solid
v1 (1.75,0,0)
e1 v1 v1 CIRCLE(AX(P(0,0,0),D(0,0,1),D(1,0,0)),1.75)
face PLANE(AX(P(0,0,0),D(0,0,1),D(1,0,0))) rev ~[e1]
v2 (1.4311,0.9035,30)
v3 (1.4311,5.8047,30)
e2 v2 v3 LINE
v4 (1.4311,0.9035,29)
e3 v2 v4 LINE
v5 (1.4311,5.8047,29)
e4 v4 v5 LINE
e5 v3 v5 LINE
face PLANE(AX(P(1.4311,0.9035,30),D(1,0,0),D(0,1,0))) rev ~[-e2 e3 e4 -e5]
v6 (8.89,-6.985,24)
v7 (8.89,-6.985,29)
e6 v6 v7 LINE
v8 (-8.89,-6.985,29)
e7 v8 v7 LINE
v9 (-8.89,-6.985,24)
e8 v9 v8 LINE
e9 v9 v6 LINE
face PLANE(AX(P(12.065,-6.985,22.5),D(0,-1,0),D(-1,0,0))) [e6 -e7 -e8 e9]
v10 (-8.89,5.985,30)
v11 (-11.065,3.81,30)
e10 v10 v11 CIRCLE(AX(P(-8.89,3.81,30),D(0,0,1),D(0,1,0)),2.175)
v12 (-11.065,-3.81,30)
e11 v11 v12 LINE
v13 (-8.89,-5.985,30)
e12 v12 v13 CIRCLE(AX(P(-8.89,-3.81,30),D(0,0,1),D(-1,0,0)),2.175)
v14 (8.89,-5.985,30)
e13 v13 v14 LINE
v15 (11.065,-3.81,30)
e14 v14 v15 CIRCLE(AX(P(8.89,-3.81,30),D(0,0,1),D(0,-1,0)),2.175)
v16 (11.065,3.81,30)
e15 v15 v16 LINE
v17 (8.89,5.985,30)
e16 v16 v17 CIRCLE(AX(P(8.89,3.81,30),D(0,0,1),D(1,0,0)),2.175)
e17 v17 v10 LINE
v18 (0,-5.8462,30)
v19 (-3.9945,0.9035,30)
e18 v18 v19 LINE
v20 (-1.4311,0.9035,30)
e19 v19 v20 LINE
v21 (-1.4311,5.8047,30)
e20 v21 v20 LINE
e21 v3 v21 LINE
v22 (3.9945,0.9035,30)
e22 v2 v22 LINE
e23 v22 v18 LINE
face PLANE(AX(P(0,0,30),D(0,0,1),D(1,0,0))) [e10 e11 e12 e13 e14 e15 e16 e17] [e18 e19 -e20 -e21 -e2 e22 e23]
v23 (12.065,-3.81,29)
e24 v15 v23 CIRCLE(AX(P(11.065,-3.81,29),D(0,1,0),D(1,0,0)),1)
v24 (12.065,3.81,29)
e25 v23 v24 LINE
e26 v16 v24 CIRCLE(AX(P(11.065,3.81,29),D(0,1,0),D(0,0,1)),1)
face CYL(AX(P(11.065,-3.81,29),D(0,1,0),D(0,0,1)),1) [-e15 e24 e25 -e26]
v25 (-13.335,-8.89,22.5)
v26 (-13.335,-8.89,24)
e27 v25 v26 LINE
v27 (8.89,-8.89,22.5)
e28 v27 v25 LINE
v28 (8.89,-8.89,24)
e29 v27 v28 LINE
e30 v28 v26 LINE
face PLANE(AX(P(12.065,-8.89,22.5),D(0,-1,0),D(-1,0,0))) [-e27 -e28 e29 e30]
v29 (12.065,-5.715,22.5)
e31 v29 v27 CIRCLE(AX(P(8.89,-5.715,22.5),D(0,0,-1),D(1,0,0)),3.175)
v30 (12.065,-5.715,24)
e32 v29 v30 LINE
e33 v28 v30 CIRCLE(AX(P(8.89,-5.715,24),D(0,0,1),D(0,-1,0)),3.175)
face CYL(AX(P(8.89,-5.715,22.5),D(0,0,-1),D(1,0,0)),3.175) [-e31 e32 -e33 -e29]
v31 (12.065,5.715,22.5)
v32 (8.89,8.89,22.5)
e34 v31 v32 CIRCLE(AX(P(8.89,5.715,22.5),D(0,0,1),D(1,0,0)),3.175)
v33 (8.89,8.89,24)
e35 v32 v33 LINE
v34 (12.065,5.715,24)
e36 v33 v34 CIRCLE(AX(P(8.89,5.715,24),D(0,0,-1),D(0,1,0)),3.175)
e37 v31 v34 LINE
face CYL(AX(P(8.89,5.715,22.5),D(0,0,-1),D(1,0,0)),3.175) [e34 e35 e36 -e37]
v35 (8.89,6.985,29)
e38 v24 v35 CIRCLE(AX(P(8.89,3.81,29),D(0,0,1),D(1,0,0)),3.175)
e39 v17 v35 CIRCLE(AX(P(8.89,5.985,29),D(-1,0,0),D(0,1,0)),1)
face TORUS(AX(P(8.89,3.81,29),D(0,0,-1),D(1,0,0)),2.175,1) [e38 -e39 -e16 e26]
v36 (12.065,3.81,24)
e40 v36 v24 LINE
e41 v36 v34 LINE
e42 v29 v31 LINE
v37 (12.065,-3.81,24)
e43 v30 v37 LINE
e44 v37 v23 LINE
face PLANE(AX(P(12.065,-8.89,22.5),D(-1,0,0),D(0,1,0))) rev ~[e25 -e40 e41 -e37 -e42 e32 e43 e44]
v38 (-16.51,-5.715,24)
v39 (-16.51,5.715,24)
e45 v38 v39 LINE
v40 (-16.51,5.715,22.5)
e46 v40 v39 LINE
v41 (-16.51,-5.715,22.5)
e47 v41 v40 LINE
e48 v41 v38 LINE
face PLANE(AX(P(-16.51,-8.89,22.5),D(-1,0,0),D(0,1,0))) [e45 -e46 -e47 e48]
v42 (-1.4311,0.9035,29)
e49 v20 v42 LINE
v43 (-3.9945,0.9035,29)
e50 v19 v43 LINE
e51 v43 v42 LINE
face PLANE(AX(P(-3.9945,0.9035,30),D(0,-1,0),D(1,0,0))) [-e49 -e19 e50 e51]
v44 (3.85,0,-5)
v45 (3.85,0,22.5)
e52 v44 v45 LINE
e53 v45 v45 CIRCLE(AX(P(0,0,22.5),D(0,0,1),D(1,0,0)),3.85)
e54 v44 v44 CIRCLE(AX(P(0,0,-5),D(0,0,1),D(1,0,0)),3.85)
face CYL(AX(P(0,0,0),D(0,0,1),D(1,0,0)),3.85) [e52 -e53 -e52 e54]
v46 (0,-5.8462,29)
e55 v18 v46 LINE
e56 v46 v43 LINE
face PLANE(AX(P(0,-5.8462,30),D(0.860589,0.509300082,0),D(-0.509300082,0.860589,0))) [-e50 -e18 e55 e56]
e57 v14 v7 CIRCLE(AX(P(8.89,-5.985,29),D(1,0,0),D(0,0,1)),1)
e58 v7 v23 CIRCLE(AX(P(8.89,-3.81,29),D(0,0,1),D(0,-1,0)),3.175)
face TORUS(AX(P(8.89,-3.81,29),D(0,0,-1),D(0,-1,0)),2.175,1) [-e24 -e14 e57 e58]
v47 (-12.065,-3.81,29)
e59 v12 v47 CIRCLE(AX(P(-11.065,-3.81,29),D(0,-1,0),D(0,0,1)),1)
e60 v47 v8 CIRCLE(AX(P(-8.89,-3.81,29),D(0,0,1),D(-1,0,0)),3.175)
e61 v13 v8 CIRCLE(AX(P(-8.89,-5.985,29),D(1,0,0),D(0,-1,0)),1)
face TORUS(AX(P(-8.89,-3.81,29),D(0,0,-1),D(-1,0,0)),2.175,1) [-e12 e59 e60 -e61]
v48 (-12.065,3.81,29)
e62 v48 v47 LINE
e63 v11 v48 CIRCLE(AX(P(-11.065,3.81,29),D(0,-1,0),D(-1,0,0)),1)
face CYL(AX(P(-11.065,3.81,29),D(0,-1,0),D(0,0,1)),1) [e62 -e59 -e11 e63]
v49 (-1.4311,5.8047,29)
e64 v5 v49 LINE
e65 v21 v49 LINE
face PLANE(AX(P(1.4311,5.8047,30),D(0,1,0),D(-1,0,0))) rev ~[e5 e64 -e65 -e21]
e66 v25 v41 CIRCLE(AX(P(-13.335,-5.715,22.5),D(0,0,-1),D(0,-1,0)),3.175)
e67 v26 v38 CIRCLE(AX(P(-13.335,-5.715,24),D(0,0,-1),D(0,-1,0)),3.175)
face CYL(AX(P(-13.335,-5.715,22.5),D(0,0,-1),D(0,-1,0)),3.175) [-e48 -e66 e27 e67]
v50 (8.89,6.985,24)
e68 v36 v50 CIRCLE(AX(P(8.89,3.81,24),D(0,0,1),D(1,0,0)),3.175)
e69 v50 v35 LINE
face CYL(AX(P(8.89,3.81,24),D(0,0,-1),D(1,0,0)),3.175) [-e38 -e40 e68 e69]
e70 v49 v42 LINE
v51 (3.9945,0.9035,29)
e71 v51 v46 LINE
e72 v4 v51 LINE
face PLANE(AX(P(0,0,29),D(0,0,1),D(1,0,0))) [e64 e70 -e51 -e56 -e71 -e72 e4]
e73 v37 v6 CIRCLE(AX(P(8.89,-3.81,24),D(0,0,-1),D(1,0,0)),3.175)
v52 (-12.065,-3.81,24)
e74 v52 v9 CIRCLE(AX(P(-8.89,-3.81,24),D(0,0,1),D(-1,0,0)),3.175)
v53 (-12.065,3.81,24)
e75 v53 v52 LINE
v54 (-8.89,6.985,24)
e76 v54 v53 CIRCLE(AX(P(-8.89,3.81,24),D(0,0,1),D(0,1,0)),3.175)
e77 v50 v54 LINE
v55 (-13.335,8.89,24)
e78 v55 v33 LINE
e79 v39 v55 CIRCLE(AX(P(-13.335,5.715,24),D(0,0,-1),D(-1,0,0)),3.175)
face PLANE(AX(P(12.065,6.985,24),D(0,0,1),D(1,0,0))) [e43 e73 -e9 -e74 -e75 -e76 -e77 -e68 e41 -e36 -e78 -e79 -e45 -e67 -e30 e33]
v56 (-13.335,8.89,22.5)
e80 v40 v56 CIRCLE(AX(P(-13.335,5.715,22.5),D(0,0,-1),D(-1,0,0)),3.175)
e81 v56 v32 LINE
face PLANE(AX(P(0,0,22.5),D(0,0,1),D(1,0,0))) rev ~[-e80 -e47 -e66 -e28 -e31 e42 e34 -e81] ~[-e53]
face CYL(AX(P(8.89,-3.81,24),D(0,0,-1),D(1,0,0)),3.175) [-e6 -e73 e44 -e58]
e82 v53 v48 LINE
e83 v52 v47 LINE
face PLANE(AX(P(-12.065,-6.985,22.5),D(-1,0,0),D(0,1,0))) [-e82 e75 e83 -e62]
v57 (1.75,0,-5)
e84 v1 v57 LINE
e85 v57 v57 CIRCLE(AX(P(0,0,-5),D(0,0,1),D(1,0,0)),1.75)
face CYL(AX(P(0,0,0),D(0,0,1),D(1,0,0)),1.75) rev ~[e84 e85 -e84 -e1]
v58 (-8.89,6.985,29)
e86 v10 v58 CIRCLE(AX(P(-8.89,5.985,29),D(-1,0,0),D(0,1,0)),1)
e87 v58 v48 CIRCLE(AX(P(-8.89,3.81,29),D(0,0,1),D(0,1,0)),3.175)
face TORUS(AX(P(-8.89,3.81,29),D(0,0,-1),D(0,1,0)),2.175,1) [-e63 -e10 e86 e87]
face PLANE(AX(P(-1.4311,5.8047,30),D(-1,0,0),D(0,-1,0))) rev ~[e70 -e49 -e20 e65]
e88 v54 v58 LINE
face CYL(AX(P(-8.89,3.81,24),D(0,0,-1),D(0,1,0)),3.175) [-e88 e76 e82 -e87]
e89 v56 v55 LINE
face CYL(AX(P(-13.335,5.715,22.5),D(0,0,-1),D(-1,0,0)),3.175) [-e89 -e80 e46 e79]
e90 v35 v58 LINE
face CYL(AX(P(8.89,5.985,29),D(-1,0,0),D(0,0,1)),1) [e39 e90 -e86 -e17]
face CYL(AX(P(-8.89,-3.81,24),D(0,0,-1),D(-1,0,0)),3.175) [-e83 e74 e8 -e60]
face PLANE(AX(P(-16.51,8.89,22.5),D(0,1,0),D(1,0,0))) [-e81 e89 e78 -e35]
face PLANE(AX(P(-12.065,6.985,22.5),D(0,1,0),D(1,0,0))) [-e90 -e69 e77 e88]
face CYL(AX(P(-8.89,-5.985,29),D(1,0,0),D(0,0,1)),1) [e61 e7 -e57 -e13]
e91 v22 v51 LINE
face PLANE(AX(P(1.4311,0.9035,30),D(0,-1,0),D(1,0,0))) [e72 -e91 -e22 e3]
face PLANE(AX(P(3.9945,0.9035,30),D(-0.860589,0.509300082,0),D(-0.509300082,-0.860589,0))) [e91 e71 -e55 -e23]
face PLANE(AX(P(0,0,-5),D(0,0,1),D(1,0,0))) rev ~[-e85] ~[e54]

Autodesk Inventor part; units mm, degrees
ref_plane "YZ Plane" through (0, 0, 0) normal (1, 0, 0) x (0, 1, 0)
ref_plane "XZ Plane" through (0, 0, 0) normal (0, 1, 0) x (-1, 0, 0)
ref_plane "XY Plane" through (0, 0, 0) normal (0, 0, 1) x (1, 0, 0)
sketch "Sketch1" plane through (0, 0, 0) normal (0, 0, 1) x (1, 0, 0)
  circle A0 centre (0, 0) radius 1.75 projected
  circle A1 centre (0, 0) radius 3.85
  point P0 (0, 0)
extrude "Extrusion1" add sketch "Sketch1" against normal blind 5
sketch "Sketch2" plane through (0, 0, 0) normal (0, 0, 1) x (1, 0, 0)
  point P0 (0, 0)
sketch "Sketch3" plane through (0, 0, 0) normal (0, 0, 1) x (1, 0, 0)
  circle A0 centre (0, 0) radius 3.85
extrude "Extrusion2" add sketch "Sketch3" along normal blind 22.5
sketch "Sketch4" plane through (0, 0, 22.5) normal (0, 0, 1) x (1, 0, 0)
  line L0 (12.065, -6.985) -> (-12.065, -6.985)
  line L1 (-12.065, -6.985) -> (-12.065, 6.985)
  line L2 (-12.065, 6.985) -> (12.065, 6.985)
  line L3 (12.065, 6.985) -> (12.065, -6.985)
  circle A0 centre (0, 0) radius 1.85 projected
  line L4 (12.065, -6.985) -> (-12.065, 6.985) construction
  line L5 (-12.065, -6.985) -> (12.065, 6.985) construction
  line L6 (12.065, 12.065) -> (-12.065, 12.065) construction
  line L7 (-12.065, 12.065) -> (-12.065, 26.035) construction
  line L8 (-12.065, 26.035) -> (12.065, 26.035) construction
  line L9 (12.065, 26.035) -> (12.065, 12.065) construction
  line L10 (12.065, 12.065) -> (-12.065, 26.035) construction
  line L11 (-12.065, 12.065) -> (12.065, 26.035) construction
  line L12 (12.065, -8.89) -> (-16.51, -8.89)
  line L13 (-16.51, -8.89) -> (-16.51, 8.89)
  line L14 (-16.51, 8.89) -> (12.065, 8.89)
  line L15 (16.51, -8.89) -> (-16.51, 8.89) construction
  line L16 (-16.51, -8.89) -> (12.065, 6.4965) construction
  line L17 (12.065, -8.89) -> (12.065, 8.89)
  point P0 (0, 0)
  point P1 (0, 19.05)
  dimension "d6" = 24.13
  dimension "d7" = 13.97
  dimension "d10" = 19.05
  dimension "d16" = 17.78
extrude "Extrusion3" add sketch "Sketch4" along normal blind 1.5 contours L17 L12 L13 L14 L2 L1 L0 | L0 L1 L2 L3 | A0
extrude "Extrusion4" add sketch "Sketch4" along normal blind 7.5 contours L0 L1 L2 L3 | A0
fillet "Fillet1" radius 3.175 8 edges at (-12.065, 6.985, 27) (12.065, 6.985, 27) (12.065, -6.985, 27) (-12.065, -6.985, 27) (-16.51, -8.89, 23.25) (12.065, 8.89, 23.25) (-16.51, 8.89, 23.25) (12.065, -8.89, 23.25)
sketch "Sketch5" plane through (0, 0, 30) normal (0, 0, 1) x (1, 0, 0)
  line L0 (0, -5.8462) -> (3.9945, 0.9035)
  line L1 (-3.9945, 0.9035) -> (0, -5.8462)
  line L2 (-1.4311, 0.9035) -> (-1.4311, 5.8047)
  line L3 (-1.4311, 5.8047) -> (1.4311, 5.8047)
  line L4 (1.4311, 5.8047) -> (1.4311, 0.9035)
  line L5 (-8.89, -6.985) -> (8.89, -6.985) projected
  arc A0 (-8.89, 6.985) -> (-12.065, 3.81) centre (-8.89, 3.81) ccw projected
  line L6 (8.89, 6.985) -> (-8.89, 6.985) projected
  arc A1 (12.065, 3.81) -> (8.89, 6.985) centre (8.89, 3.81) ccw projected
  arc A2 (8.89, -6.985) -> (12.065, -3.81) centre (8.89, -3.81) ccw projected
  line L7 (12.065, -3.81) -> (12.065, 3.81) projected
  arc A3 (-12.065, -3.81) -> (-8.89, -6.985) centre (-8.89, -3.81) ccw projected
  line L8 (-12.065, 3.81) -> (-12.065, -3.81) projected
  line L9 (3.9945, 0.9035) -> (1.4311, 0.9035)
  line L10 (-1.4311, 0.9035) -> (-3.9945, 0.9035)
  point P0 (0, 0)
  point P1 (0, 0.9035)
  point P2 (0, -6.985)
emboss "Emboss1" sketch "Sketch5" operation cut depth 1 direction (0, 0, -1) contours L1 L10 L2 L3 L4 L9 L0
fillet "Fillet2" radius 1 8 edges at (-11.1351, 6.0551, 30) (-12.065, 0, 30) (-11.1351, -6.0551, 30) (0, -6.985, 30) (11.1351, -6.0551, 30) (12.065, 0, 30) (11.1351, 6.0551, 30) (0, 6.985, 30)
properties part number "Button Cover"
